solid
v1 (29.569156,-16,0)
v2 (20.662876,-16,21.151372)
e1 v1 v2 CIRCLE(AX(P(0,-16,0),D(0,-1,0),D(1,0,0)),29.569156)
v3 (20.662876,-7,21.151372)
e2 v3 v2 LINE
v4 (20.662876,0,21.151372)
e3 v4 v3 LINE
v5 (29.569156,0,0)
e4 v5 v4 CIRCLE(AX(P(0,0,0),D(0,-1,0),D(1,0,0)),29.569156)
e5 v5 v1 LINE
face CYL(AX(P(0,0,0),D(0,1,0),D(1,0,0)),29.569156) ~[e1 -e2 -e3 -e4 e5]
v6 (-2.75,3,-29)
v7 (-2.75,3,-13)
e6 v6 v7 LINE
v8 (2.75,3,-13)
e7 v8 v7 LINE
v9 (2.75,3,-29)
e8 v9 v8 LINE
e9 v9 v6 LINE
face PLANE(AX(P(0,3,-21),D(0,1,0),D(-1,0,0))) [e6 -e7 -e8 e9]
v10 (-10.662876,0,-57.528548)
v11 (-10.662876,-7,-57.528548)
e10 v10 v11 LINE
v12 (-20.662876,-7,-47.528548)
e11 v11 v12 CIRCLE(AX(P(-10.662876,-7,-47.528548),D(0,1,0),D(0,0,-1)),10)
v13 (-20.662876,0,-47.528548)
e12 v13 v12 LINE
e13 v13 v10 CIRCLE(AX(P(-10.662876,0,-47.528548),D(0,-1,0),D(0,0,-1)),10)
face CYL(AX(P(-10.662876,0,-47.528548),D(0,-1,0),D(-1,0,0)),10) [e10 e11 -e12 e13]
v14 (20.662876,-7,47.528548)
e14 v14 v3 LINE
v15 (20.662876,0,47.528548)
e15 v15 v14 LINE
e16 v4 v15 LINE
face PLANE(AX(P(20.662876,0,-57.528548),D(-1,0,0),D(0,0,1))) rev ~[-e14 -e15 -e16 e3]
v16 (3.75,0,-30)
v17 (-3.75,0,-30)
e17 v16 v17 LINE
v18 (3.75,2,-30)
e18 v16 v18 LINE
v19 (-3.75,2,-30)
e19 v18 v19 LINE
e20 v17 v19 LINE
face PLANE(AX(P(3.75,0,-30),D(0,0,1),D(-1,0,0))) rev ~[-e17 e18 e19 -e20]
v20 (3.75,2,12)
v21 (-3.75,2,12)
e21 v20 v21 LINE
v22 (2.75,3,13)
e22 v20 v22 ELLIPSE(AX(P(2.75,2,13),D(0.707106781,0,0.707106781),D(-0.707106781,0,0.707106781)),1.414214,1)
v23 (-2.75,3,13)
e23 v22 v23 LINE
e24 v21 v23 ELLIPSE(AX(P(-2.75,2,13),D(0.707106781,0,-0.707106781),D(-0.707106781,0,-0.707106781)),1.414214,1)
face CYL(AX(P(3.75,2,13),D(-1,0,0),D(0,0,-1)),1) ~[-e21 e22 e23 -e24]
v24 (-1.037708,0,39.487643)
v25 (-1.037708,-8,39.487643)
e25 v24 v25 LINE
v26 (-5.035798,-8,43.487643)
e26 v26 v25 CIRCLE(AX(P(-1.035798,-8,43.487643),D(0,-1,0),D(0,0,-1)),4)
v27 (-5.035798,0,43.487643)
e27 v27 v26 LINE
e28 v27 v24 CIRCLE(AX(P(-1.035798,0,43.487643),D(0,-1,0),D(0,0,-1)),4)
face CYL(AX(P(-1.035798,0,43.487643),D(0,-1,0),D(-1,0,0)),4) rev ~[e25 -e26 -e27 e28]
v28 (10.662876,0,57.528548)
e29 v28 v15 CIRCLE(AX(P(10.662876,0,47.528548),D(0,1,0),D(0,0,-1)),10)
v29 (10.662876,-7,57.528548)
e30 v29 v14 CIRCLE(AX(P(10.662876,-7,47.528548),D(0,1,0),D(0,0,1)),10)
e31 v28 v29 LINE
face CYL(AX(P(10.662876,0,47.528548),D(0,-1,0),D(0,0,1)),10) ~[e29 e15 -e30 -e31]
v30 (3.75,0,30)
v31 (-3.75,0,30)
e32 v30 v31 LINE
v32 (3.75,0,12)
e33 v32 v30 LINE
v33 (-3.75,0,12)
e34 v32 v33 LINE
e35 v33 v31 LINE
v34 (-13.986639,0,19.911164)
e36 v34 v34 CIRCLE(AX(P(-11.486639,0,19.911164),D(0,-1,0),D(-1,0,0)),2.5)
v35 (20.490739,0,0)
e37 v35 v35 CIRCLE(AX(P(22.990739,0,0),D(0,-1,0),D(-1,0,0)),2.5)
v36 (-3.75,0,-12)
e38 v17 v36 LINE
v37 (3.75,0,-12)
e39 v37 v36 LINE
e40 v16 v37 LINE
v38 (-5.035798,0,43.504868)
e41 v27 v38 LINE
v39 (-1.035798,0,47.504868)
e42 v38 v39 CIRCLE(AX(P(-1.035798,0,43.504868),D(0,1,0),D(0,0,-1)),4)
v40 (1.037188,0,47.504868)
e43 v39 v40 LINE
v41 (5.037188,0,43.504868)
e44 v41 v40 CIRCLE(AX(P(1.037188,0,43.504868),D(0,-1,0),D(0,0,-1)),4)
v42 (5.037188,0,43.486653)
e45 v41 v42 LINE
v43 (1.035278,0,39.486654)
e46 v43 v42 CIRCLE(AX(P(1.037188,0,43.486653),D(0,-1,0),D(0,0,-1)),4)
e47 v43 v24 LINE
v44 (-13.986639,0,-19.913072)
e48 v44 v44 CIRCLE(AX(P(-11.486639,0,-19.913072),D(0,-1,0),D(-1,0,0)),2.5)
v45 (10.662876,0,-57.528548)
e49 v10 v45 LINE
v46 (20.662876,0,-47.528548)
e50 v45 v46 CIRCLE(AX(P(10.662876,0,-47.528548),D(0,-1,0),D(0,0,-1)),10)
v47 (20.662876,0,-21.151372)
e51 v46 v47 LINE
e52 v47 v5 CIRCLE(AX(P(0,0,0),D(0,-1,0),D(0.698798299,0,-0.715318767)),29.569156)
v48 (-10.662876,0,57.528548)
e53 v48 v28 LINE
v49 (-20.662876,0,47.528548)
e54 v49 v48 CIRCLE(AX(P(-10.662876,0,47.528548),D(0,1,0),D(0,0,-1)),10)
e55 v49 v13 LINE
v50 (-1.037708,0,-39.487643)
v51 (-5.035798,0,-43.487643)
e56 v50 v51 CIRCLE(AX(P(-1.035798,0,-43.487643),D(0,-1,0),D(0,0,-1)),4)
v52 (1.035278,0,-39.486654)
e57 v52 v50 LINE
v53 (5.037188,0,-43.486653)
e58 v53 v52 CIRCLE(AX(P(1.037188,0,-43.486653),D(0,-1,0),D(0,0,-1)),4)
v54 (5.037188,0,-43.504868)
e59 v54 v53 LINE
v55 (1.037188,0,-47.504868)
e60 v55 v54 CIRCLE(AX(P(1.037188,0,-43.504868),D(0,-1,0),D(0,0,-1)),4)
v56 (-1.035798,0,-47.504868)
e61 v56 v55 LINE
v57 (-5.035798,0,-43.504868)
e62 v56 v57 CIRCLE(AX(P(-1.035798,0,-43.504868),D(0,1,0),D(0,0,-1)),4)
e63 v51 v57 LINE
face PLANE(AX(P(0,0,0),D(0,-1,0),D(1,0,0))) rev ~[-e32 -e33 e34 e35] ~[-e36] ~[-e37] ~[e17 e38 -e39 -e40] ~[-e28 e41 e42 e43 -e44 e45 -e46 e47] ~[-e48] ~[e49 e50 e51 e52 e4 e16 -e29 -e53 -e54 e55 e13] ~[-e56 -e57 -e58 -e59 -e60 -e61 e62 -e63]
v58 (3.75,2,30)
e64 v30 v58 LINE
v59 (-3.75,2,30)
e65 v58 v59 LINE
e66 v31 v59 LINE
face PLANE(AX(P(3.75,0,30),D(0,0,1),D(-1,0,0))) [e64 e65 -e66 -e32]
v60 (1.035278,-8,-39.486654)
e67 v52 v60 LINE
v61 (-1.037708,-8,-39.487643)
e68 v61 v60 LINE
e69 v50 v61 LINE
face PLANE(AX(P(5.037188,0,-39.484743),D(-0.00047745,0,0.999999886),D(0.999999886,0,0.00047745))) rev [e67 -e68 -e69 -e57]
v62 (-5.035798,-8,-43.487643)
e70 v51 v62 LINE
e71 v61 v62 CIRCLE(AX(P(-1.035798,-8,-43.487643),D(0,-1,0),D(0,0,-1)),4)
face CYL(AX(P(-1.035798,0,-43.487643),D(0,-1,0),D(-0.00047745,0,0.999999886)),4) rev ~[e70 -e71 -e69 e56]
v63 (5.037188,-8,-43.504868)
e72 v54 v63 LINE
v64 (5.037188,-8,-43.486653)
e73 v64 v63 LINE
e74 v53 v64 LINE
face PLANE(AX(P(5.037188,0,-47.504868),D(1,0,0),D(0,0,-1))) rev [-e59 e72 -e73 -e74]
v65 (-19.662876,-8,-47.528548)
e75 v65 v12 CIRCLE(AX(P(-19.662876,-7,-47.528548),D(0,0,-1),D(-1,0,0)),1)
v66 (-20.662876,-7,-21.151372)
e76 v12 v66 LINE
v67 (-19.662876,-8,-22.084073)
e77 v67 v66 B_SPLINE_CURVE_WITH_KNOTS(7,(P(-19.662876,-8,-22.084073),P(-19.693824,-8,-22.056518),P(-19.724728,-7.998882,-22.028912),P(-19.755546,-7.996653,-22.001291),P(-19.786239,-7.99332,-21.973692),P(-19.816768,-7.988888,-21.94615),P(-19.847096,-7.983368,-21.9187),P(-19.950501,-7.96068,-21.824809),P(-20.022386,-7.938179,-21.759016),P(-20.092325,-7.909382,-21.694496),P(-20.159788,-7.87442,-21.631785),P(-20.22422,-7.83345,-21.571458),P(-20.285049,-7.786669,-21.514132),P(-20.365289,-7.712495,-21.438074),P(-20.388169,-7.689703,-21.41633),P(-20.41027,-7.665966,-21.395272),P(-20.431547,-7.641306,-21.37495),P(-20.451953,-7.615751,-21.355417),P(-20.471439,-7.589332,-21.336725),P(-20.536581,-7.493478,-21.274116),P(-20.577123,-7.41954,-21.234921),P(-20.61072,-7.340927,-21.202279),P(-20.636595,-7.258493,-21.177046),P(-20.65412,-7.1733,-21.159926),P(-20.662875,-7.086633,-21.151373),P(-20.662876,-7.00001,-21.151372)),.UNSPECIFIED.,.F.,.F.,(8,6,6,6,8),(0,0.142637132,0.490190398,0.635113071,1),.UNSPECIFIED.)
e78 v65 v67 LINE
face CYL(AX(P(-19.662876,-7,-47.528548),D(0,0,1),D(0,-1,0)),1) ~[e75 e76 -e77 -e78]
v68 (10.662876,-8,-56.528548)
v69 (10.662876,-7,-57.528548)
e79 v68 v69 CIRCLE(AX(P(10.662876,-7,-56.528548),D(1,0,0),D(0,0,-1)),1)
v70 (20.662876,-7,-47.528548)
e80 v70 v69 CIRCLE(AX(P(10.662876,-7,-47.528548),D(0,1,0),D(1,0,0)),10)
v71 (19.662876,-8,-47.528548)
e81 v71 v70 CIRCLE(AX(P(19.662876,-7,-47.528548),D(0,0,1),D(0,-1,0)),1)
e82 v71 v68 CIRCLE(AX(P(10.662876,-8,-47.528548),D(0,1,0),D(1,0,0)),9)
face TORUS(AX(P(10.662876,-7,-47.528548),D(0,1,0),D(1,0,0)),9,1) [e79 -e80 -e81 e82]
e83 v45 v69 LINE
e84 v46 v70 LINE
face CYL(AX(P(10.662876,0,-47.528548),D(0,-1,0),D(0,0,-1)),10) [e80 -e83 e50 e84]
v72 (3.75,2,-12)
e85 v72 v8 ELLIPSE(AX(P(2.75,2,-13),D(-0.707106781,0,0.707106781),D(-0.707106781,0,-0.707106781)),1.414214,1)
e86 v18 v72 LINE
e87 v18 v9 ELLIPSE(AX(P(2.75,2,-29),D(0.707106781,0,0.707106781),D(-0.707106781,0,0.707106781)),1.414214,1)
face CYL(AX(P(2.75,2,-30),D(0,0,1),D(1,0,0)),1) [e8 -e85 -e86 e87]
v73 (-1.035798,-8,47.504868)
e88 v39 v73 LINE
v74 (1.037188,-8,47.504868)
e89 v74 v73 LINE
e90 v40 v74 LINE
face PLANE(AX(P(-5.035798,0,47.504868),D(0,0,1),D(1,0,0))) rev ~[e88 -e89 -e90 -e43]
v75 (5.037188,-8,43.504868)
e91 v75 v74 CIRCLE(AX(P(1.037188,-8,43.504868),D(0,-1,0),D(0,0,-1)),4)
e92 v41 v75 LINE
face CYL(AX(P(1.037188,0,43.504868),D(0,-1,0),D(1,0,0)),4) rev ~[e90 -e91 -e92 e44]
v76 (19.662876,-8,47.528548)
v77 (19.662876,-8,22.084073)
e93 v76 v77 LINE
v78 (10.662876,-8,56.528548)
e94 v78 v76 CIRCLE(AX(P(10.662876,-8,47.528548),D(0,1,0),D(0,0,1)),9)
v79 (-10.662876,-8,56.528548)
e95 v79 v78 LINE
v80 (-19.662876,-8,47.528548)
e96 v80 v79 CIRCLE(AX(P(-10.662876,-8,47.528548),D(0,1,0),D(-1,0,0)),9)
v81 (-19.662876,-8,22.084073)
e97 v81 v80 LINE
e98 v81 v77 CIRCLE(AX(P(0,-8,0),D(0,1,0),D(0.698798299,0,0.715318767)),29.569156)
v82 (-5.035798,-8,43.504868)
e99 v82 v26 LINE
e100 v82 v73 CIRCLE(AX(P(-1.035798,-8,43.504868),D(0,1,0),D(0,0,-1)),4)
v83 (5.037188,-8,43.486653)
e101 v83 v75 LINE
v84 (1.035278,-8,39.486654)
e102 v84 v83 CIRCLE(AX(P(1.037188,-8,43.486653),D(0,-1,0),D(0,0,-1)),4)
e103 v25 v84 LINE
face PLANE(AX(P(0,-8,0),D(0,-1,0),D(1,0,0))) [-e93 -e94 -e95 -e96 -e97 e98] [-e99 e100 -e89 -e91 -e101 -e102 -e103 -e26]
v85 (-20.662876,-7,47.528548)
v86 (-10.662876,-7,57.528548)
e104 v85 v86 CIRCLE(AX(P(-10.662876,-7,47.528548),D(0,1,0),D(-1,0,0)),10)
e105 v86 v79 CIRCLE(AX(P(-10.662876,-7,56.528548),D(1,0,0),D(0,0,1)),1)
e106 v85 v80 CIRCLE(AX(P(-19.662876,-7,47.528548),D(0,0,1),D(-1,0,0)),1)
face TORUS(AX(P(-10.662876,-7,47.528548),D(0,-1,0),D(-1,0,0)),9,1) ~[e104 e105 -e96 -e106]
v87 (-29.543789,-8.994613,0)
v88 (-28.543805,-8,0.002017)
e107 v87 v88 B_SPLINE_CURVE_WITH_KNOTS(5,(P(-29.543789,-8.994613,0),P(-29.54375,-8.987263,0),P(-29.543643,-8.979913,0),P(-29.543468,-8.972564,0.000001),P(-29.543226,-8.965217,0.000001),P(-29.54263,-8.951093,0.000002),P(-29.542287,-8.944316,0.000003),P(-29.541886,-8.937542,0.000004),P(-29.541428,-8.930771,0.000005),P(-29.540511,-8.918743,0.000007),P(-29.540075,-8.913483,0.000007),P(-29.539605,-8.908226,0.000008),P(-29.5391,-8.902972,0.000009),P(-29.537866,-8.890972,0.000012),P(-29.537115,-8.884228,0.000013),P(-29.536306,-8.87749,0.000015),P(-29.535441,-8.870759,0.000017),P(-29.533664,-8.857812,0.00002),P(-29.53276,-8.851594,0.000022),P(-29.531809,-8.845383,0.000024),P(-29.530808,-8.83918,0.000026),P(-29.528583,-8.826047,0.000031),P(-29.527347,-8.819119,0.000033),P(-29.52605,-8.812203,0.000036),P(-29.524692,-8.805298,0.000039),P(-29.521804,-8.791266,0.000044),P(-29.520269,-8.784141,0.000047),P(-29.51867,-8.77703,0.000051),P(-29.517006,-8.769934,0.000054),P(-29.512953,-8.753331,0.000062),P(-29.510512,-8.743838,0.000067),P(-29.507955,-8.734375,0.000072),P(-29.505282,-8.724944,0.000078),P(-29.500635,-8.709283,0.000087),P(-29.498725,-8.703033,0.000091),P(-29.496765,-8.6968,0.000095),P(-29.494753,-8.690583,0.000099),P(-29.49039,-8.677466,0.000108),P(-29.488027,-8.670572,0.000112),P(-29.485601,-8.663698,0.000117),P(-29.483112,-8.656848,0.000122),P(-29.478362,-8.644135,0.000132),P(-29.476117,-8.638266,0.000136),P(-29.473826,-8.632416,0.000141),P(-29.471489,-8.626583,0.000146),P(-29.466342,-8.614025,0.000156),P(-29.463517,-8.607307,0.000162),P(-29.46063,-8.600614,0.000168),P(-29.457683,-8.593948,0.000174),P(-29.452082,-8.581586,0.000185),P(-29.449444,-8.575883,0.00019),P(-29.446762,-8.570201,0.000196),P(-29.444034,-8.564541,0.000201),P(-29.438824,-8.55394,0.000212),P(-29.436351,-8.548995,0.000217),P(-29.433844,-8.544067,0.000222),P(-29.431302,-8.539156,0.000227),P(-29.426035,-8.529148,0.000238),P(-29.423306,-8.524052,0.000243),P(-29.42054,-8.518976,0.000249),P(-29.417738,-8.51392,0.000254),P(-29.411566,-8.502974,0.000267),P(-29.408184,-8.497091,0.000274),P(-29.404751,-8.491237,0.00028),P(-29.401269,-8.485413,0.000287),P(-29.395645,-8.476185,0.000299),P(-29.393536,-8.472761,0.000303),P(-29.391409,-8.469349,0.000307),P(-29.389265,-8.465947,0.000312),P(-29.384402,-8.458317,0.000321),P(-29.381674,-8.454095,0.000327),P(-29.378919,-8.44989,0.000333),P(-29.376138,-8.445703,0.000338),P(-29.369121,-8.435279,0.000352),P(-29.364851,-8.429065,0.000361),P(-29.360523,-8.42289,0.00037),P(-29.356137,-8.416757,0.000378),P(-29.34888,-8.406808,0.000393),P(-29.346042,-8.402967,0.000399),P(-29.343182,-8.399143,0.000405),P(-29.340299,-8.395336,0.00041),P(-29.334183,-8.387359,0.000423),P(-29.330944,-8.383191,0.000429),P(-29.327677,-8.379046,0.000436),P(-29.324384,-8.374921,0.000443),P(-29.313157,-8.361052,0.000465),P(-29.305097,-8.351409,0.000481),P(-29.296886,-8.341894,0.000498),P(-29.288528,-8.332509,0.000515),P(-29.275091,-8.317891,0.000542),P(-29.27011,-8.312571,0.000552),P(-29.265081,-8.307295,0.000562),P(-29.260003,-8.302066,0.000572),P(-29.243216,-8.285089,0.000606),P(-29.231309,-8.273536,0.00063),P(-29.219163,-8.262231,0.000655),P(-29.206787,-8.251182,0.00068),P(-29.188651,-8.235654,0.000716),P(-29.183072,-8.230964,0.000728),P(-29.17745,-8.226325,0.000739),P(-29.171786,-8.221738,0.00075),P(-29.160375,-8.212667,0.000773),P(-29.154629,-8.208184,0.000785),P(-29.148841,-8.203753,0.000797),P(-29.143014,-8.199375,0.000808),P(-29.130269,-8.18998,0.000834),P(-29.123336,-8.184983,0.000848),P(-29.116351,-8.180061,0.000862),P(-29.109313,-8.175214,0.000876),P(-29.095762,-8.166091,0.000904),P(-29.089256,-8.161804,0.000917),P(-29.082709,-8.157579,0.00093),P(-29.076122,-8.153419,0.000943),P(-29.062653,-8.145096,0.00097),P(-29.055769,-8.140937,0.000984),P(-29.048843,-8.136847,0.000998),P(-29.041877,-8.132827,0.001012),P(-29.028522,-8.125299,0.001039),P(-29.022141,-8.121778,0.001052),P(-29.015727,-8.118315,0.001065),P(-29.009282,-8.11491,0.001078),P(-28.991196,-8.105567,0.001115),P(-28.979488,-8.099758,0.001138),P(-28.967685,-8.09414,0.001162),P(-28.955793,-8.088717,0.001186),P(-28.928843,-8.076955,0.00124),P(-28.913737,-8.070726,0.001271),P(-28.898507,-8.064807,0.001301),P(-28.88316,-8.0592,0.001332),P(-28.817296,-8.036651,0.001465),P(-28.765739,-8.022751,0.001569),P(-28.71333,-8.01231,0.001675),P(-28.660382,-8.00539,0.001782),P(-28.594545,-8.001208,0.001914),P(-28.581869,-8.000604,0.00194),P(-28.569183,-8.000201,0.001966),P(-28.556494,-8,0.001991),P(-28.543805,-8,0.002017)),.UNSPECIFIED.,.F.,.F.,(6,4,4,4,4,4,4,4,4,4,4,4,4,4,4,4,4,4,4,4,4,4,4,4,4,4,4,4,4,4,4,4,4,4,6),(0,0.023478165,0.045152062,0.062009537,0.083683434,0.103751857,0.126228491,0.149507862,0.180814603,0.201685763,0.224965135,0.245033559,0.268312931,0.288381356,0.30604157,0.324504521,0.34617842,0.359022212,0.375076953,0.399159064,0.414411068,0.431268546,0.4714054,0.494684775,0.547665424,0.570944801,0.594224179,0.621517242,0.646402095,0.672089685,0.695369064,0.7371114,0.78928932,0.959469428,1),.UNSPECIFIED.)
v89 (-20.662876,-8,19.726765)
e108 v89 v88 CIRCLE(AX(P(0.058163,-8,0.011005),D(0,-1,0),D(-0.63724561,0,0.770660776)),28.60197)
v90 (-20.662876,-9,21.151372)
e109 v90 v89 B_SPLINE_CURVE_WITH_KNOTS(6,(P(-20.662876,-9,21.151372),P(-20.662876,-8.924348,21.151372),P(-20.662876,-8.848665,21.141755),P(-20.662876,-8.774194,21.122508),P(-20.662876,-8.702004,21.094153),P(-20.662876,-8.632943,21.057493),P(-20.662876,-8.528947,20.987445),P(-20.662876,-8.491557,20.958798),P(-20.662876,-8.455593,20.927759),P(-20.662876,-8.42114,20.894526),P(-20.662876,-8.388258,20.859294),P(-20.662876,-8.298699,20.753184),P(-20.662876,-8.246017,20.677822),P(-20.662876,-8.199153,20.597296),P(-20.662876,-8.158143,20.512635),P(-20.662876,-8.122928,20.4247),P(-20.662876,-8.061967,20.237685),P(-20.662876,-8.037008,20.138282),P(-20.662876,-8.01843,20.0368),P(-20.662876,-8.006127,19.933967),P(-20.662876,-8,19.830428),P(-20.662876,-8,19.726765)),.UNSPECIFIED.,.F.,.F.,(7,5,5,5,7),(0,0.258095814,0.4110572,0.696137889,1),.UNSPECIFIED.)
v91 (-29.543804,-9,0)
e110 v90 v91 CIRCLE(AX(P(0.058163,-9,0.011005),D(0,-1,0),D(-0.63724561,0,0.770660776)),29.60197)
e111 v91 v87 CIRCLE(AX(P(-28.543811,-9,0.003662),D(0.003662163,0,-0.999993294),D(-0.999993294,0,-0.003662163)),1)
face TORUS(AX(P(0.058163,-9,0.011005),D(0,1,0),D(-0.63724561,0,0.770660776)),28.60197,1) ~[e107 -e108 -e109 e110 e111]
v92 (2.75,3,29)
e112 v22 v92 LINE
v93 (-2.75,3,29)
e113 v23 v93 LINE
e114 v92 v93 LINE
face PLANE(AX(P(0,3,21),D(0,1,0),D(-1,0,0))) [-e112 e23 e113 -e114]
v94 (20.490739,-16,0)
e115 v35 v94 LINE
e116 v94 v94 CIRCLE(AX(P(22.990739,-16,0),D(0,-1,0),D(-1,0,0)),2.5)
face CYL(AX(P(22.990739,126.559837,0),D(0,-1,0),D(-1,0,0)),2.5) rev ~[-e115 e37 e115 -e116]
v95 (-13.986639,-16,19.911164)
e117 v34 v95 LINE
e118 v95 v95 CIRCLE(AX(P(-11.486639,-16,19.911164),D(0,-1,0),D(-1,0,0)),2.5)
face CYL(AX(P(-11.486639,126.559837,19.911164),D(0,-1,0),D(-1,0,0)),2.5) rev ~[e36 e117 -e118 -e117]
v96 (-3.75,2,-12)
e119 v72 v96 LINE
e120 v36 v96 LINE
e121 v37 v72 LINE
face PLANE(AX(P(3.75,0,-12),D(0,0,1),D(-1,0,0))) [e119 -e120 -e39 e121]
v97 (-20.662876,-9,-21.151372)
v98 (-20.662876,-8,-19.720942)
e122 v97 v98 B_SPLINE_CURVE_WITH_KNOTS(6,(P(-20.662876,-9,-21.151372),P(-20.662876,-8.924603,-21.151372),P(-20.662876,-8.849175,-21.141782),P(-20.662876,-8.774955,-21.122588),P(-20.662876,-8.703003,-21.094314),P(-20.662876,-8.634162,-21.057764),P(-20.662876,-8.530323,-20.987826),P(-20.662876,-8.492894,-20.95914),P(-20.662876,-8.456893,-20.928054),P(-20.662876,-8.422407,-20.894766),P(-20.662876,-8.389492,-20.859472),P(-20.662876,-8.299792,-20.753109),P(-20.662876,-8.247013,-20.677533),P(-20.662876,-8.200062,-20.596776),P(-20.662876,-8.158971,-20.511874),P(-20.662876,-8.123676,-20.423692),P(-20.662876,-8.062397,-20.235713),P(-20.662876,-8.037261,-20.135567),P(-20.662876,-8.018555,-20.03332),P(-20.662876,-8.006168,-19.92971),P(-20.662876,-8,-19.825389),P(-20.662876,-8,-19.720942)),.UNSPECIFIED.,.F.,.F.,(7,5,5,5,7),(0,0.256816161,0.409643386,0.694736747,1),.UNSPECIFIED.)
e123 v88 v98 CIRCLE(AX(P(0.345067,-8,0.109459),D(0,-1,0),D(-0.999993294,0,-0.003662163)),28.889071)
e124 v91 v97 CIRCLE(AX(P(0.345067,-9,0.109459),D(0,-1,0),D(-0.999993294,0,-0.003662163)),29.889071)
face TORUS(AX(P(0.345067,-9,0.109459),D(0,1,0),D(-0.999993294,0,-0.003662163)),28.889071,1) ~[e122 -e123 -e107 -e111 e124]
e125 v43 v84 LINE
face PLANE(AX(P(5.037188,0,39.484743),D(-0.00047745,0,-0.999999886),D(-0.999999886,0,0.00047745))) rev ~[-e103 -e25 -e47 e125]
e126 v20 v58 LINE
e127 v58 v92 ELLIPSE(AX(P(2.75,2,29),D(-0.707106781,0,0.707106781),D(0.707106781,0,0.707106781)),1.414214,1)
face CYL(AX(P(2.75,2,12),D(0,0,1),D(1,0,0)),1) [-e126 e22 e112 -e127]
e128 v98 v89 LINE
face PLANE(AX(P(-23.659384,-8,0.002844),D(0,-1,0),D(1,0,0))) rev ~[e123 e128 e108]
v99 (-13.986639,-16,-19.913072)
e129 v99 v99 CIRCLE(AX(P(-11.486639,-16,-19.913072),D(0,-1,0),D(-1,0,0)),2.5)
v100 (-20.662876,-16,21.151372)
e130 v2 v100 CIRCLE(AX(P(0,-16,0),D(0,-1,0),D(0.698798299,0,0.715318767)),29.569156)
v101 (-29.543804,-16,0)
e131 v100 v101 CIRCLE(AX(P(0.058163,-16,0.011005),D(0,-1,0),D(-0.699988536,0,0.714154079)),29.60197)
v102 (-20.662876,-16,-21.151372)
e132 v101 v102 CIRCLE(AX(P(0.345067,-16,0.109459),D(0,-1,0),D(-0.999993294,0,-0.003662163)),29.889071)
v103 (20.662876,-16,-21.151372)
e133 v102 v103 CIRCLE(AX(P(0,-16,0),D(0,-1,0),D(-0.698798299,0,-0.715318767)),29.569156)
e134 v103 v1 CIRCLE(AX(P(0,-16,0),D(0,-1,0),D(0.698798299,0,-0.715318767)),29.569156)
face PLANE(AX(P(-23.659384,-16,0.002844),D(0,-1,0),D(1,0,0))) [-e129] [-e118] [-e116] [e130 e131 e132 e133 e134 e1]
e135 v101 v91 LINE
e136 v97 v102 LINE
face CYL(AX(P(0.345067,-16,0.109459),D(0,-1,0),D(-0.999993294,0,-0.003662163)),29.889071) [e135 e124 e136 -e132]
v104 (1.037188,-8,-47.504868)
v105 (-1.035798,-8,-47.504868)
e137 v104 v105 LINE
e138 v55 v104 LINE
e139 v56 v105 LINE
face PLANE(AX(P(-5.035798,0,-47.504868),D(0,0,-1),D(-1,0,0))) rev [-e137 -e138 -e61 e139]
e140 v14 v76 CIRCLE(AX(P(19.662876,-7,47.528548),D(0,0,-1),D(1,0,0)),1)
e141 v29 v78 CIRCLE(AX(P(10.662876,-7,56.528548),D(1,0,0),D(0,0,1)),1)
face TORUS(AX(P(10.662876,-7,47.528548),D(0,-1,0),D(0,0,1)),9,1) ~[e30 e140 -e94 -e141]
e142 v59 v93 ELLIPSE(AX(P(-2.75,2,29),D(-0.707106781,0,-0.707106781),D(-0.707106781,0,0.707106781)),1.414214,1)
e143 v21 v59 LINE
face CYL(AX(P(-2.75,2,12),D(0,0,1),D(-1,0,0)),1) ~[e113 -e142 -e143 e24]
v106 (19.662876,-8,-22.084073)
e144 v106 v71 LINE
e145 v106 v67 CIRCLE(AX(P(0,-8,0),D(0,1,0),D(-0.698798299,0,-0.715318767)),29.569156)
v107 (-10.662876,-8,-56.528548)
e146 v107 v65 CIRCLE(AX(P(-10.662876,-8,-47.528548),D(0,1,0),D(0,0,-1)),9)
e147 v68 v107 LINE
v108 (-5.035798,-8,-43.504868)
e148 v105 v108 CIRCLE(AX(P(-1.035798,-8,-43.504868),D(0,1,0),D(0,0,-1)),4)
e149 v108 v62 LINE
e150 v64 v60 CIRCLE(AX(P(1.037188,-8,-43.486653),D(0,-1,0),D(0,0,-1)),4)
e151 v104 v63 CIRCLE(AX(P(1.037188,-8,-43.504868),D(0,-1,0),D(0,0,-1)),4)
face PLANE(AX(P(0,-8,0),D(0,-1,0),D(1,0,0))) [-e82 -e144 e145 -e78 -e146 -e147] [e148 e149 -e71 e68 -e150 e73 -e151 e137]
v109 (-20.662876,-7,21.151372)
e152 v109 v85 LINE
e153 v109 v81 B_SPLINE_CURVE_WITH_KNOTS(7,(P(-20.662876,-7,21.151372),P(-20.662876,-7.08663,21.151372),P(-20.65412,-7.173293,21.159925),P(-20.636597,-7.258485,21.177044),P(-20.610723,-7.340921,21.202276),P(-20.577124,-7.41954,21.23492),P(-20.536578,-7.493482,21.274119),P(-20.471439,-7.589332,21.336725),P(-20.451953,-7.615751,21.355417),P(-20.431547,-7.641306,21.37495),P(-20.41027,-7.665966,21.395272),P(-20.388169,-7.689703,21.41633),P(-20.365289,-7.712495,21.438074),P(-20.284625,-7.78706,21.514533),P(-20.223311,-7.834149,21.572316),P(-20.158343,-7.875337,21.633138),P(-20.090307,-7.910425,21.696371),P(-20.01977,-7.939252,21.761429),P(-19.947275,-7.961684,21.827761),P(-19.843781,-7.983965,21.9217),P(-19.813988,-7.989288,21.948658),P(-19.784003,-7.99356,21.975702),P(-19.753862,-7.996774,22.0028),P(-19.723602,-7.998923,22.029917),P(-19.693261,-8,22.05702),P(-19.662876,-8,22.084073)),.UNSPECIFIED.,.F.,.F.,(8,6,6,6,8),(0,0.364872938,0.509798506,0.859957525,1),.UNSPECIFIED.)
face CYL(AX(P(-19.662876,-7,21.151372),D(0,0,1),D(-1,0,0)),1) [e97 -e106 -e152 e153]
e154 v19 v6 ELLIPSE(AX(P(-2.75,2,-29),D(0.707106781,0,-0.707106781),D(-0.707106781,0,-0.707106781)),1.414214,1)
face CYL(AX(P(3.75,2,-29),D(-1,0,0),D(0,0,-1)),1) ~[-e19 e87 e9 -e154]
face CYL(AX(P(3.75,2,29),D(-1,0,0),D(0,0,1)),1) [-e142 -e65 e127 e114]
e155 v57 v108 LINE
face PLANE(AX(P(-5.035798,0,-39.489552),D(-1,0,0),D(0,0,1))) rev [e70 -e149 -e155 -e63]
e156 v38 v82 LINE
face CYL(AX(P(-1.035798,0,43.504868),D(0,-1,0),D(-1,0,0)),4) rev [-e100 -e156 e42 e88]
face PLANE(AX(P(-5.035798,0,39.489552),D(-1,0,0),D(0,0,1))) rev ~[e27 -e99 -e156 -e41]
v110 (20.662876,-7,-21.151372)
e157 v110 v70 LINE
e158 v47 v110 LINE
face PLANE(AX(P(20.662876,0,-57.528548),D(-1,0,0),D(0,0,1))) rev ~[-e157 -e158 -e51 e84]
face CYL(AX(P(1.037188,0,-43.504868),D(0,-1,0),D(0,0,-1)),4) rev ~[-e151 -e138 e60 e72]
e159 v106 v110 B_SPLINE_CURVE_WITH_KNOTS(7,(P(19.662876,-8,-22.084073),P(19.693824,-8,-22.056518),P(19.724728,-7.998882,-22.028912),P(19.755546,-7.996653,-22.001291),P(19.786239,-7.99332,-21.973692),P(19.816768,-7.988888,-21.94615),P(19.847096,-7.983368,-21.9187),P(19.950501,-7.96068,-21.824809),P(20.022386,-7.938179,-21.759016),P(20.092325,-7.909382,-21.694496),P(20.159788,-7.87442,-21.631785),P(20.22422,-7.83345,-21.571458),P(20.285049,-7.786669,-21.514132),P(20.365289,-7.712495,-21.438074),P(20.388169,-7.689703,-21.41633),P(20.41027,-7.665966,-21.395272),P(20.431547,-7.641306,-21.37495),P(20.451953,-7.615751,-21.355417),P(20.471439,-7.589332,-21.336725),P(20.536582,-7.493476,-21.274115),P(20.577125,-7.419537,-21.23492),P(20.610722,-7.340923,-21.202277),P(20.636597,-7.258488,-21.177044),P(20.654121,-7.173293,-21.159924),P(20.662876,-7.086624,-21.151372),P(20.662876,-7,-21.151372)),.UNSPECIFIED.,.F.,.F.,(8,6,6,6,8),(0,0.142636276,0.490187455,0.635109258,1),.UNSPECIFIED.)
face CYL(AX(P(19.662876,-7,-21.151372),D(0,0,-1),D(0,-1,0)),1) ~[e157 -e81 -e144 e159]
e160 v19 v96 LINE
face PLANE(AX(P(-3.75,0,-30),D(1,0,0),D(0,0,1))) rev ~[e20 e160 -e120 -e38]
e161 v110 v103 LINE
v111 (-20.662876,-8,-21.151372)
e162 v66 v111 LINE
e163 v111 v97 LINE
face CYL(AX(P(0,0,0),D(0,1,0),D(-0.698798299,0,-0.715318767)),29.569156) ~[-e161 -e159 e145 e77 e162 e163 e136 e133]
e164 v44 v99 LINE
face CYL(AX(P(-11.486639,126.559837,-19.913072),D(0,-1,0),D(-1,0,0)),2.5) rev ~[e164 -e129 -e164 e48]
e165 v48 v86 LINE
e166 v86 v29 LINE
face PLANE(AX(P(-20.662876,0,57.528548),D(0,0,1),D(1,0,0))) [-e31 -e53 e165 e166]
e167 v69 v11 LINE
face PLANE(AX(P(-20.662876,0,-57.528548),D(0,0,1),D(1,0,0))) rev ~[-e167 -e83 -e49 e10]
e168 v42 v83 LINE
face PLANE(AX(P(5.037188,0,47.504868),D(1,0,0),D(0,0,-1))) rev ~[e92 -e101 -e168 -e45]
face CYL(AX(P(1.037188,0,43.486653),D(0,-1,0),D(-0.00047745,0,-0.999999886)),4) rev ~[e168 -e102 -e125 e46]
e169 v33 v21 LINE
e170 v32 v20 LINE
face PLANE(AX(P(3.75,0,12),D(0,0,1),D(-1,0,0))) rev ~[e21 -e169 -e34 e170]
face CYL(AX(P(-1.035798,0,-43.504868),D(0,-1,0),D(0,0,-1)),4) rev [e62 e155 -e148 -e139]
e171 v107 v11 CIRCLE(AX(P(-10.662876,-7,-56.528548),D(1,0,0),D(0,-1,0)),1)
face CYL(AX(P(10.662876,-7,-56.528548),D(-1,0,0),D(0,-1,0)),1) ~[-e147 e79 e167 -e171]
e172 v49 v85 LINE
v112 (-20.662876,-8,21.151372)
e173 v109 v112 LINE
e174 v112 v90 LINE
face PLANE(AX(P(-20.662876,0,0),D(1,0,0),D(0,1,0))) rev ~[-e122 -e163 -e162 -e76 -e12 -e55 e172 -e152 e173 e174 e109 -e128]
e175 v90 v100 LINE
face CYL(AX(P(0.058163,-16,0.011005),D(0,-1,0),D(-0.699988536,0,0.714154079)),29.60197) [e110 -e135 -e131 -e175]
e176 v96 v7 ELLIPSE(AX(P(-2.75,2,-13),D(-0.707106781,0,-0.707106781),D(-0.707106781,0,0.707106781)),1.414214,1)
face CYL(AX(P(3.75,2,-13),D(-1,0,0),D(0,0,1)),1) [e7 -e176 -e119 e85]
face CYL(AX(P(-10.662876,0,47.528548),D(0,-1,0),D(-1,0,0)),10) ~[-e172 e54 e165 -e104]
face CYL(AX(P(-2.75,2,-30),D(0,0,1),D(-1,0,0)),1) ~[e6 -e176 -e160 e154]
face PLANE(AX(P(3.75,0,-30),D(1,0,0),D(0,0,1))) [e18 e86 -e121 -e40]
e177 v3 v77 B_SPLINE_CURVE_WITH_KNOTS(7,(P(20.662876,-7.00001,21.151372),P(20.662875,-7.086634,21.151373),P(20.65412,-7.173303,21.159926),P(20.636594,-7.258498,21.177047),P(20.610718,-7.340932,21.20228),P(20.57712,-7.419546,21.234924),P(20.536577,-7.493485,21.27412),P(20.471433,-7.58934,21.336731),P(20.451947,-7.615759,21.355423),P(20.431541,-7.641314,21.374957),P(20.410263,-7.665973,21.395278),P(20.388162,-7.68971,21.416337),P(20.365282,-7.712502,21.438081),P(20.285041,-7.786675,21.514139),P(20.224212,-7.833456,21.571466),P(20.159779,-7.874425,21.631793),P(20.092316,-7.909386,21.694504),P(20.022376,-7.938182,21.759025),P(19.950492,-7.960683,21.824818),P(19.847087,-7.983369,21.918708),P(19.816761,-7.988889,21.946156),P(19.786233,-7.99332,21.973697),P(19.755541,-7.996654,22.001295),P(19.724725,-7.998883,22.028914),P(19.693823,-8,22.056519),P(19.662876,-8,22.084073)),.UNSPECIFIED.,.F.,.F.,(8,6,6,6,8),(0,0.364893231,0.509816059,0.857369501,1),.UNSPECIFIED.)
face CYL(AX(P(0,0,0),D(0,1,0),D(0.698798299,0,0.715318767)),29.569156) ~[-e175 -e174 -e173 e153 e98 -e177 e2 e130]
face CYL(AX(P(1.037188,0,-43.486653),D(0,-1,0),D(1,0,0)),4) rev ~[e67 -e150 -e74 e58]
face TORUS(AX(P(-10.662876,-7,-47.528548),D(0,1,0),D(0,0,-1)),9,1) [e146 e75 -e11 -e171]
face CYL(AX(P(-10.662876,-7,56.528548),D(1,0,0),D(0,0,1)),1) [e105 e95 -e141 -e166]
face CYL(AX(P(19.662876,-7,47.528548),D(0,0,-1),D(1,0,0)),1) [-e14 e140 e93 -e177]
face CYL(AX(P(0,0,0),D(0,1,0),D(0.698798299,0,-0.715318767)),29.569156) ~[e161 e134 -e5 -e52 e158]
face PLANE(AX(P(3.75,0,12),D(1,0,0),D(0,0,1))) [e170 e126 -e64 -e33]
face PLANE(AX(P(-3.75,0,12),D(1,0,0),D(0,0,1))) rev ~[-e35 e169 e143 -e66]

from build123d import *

# Parameters (mm, degrees)
F0_W          = 41.3257516921
F0_H          = 115.0570958853
F1_DEPTH      = 8
F3_DEPTH      = 16
F5_DEPTH      = 8.5
F6_R          = 4
F7_R          = 10
F9_D          = 5
F10_R         = 1
F12_DEPTH     = 8
F13_T4_ANGLE  = 50.4345634546
F13_S5_R      = 29.5691559209
F13_T6_DEPTH  = 16
F13_T11_ANGLE = 49.9258142249
F13_S12_R     = 29.5691559209
F13_T13_DEPTH = 16
F14_W         = 7.5
F14_H         = 18
F15_DEPTH     = 3
F16_R         = 1


# Not quite as in the source:
# - a fillet or chamfer that OpenCascade refuses, or shapes differently, is made with other operations: its cross-section is extruded or revolved along the edge and cut away or added
# - a pattern or mirror of a feature is missing from the dataset's text; its kind, count and spacing are read off the source's solid


with BuildPart() as f1:
    # F0 (on Front) → F1 (new body)
    with BuildSketch(Plane.XZ):
        Rectangle(F0_W, F0_H)
    extrude(amount=F1_DEPTH)

    # F2 (on face) → F3 (join)
    with BuildSketch(Plane.XZ):
        with BuildLine():
            Line((20.662875846, -21.1513721457), (20.662875846, 21.1513721457))
            ThreePointArc((20.662875846, 21.1513721457), (0, 29.5691559209), (-20.662875846, 21.1513721457))
            Line((-20.662875846, 21.1513721457), (-20.662875846, -21.1513721457))
            ThreePointArc((-20.662875846, -21.1513721457), (0, -29.5691559209), (20.662875846, -21.1513721457))
        make_face()
        with BuildLine():
            ThreePointArc((20.662875846, -21.1513721457), (27.251777736, -11.4749985666), (29.5691559209, 0))
            ThreePointArc((29.5691559209, 0), (27.251777736, 11.4749985666), (20.662875846, 21.1513721457))
            Line((20.662875846, 21.1513721457), (20.662875846, -21.1513721457))
        make_face()
    extrude(amount=F3_DEPTH)

    # F4 (on face) → F5 (cut)
    with BuildSketch(Plane(origin=(0, 0, 0), x_dir=(-1, 0, 0), z_dir=(0, 1, 0))):
        Polygon((5.0357980654, 39.4895523787), (5.0357980654, 47.5048683584), (-5.0371875986, 47.5048683584), (-5.0371875986, 39.4847430289), align=None)
    f5 = extrude(amount=-F5_DEPTH, mode=Mode.SUBTRACT)

    # F5_copies: F5 across plane
    add(f5.mirror(Plane(origin=(0, 0, 0), x_dir=(-1, 0, 0), z_dir=(0, 0, -1))), mode=Mode.SUBTRACT)

    # F6
    f6_edges = [f1.edges().sort_by_distance(p)[0] for p in [
        (5.037188, -4, -47.504868),
        (-5.035798, -4, -47.504868),
        (5.037188, -4, -39.484743),
        (-5.035798, -4, -39.489552),
        (-5.035798, -4, 47.504868),
        (-5.035798, -4, 39.489552),
        (5.037188, -4, 39.484743),
        (5.037188, -4, 47.504868),
    ]]
    fillet(f6_edges, radius=F6_R)

    # F7
    f7_edges = [f1.edges().sort_by_distance(p)[0] for p in [
        (20.662876, -4, 57.528548),
        (-20.662876, -4, 57.528548),
        (-20.662876, -4, -57.528548),
        (20.662876, -4, -57.528548),
    ]]
    fillet(f7_edges, radius=F7_R)

    # F8: union 

    # F9 (through all)
    with Locations(Plane(origin=(0, 0, 0), x_dir=(1, 0, 0), z_dir=(0, 1, 0))):
        with Locations((22.990738973, 0), (-11.4866392687, -19.9111644179), (-11.4866392687, 19.9130717665)):
            Hole(F9_D / 2)

    # F10
    f10_edges = [f1.edges().sort_by_distance(p)[0] for p in [
        (-20.662876, -8, 34.33996),
        (-20.662876, -8, -34.33996),
    ]]
    fillet(f10_edges, radius=F10_R)

    # F11 (on face) → F12 (join)
    with BuildSketch(Plane.XZ.offset(16)):
        with BuildLine():
            ThreePointArc((-20.662875846, 21.1513721457), (-27.2355425635, 11.47094423), (-29.5438040048, 0))
            ThreePointArc((-29.5438040048, 0), (-27.2133537023, -11.4616276864), (-20.662875846, -21.1513721457))
            Line((-20.662875846, -21.1513721457), (-20.662875846, 21.1513721457))
        make_face()
    extrude(amount=-F12_DEPTH)

    # F13: fillet of radius 1 on 2 edges, made by hand


with BuildPart() as f13_tool2:
    # F13_s3 → F13_t4 (revolve)
    with BuildSketch(Plane(origin=(0.039948819, 0, 0.0330329638), x_dir=(0, 1, 0), z_dir=(0.7706607763, 0, 0.6372456103))):
        with BuildLine():
            ThreePointArc((-9, 29.573386115), (-8.2928932188, 29.2804928962), (-8, 28.573386115))
            Line((-8, 28.573386115), (-7.98, 28.573386115))
            Line((-7.98, 28.573386115), (-7.98, 29.593386115))
            Line((-7.98, 29.593386115), (-9, 29.593386115))
            Line((-9, 29.593386115), (-9, 29.573386115))
        make_face()
    revolve(axis=Axis((0.058163466, -8, 0.0110048576), (0, -1, 0)), revolution_arc=F13_T4_ANGLE)

    # F13_s5 → F13_t6 (intersect, symmetric)
    with BuildSketch(Plane.XZ.offset(8.5)):
        Circle(F13_S5_R)
    extrude(amount=F13_T6_DEPTH, both=True, mode=Mode.INTERSECT)

    split(bisect_by=Plane.YZ.offset(-20.662875846), keep=Keep.BOTTOM)


with BuildPart() as f1_1:
    add(f1.part)

    # F13_t1: cut F13_tool2
    add(f13_tool2.part, mode=Mode.SUBTRACT)


with BuildPart() as f13_tool9:
    # F13_s10 → F13_t11 (revolve)
    with BuildSketch(Plane(origin=(-0.0003962248, 0, 0.1081934909), x_dir=(0, 1, 0), z_dir=(-0.0036621627, 0, 0.9999932943))):
        with BuildLine():
            ThreePointArc((-9, 29.5436058917), (-8.2928932188, 29.2507126729), (-8, 28.5436058917))
            Line((-8, 28.5436058917), (-7.98, 28.5436058917))
            Line((-7.98, 28.5436058917), (-7.98, 29.5636058917))
            Line((-7.98, 29.5636058917), (-9, 29.5636058917))
            Line((-9, 29.5636058917), (-9, 29.5436058917))
        make_face()
    revolve(axis=Axis((0.3450668448, -8, 0.1094586414), (0, -1, 0)), revolution_arc=F13_T11_ANGLE)

    # F13_s12 → F13_t13 (intersect, symmetric)
    with BuildSketch(Plane.XZ.offset(8.5)):
        Circle(F13_S12_R)
    extrude(amount=F13_T13_DEPTH, both=True, mode=Mode.INTERSECT)

    split(bisect_by=Plane.YZ.offset(-20.662875846), keep=Keep.BOTTOM)


with BuildPart() as f1_2:
    add(f1_1.part)

    # F13_t8: cut F13_tool9
    add(f13_tool9.part, mode=Mode.SUBTRACT)

    # F14 (on face) → F15 (join)
    with BuildSketch(Plane(origin=(0, 0, 0), x_dir=(-1, 0, 0), z_dir=(0, 1, 0))):
        with Locations((0, -21)):
            Rectangle(F14_W, F14_H)
        with Locations((0, 21)):
            Rectangle(F14_W, F14_H)
    extrude(amount=F15_DEPTH)

    # F16
    f16_edges = [f1_2.edges().sort_by_distance(p)[0] for p in [
        (3.75, 3, 21),
        (0, 3, 12),
        (-3.75, 3, 21),
        (0, 3, 30),
        (0, 3, -12),
        (3.75, 3, -21),
        (0, 3, -30),
        (-3.75, 3, -21),
    ]]
    fillet(f16_edges, radius=F16_R)


solid = f1_2.part
